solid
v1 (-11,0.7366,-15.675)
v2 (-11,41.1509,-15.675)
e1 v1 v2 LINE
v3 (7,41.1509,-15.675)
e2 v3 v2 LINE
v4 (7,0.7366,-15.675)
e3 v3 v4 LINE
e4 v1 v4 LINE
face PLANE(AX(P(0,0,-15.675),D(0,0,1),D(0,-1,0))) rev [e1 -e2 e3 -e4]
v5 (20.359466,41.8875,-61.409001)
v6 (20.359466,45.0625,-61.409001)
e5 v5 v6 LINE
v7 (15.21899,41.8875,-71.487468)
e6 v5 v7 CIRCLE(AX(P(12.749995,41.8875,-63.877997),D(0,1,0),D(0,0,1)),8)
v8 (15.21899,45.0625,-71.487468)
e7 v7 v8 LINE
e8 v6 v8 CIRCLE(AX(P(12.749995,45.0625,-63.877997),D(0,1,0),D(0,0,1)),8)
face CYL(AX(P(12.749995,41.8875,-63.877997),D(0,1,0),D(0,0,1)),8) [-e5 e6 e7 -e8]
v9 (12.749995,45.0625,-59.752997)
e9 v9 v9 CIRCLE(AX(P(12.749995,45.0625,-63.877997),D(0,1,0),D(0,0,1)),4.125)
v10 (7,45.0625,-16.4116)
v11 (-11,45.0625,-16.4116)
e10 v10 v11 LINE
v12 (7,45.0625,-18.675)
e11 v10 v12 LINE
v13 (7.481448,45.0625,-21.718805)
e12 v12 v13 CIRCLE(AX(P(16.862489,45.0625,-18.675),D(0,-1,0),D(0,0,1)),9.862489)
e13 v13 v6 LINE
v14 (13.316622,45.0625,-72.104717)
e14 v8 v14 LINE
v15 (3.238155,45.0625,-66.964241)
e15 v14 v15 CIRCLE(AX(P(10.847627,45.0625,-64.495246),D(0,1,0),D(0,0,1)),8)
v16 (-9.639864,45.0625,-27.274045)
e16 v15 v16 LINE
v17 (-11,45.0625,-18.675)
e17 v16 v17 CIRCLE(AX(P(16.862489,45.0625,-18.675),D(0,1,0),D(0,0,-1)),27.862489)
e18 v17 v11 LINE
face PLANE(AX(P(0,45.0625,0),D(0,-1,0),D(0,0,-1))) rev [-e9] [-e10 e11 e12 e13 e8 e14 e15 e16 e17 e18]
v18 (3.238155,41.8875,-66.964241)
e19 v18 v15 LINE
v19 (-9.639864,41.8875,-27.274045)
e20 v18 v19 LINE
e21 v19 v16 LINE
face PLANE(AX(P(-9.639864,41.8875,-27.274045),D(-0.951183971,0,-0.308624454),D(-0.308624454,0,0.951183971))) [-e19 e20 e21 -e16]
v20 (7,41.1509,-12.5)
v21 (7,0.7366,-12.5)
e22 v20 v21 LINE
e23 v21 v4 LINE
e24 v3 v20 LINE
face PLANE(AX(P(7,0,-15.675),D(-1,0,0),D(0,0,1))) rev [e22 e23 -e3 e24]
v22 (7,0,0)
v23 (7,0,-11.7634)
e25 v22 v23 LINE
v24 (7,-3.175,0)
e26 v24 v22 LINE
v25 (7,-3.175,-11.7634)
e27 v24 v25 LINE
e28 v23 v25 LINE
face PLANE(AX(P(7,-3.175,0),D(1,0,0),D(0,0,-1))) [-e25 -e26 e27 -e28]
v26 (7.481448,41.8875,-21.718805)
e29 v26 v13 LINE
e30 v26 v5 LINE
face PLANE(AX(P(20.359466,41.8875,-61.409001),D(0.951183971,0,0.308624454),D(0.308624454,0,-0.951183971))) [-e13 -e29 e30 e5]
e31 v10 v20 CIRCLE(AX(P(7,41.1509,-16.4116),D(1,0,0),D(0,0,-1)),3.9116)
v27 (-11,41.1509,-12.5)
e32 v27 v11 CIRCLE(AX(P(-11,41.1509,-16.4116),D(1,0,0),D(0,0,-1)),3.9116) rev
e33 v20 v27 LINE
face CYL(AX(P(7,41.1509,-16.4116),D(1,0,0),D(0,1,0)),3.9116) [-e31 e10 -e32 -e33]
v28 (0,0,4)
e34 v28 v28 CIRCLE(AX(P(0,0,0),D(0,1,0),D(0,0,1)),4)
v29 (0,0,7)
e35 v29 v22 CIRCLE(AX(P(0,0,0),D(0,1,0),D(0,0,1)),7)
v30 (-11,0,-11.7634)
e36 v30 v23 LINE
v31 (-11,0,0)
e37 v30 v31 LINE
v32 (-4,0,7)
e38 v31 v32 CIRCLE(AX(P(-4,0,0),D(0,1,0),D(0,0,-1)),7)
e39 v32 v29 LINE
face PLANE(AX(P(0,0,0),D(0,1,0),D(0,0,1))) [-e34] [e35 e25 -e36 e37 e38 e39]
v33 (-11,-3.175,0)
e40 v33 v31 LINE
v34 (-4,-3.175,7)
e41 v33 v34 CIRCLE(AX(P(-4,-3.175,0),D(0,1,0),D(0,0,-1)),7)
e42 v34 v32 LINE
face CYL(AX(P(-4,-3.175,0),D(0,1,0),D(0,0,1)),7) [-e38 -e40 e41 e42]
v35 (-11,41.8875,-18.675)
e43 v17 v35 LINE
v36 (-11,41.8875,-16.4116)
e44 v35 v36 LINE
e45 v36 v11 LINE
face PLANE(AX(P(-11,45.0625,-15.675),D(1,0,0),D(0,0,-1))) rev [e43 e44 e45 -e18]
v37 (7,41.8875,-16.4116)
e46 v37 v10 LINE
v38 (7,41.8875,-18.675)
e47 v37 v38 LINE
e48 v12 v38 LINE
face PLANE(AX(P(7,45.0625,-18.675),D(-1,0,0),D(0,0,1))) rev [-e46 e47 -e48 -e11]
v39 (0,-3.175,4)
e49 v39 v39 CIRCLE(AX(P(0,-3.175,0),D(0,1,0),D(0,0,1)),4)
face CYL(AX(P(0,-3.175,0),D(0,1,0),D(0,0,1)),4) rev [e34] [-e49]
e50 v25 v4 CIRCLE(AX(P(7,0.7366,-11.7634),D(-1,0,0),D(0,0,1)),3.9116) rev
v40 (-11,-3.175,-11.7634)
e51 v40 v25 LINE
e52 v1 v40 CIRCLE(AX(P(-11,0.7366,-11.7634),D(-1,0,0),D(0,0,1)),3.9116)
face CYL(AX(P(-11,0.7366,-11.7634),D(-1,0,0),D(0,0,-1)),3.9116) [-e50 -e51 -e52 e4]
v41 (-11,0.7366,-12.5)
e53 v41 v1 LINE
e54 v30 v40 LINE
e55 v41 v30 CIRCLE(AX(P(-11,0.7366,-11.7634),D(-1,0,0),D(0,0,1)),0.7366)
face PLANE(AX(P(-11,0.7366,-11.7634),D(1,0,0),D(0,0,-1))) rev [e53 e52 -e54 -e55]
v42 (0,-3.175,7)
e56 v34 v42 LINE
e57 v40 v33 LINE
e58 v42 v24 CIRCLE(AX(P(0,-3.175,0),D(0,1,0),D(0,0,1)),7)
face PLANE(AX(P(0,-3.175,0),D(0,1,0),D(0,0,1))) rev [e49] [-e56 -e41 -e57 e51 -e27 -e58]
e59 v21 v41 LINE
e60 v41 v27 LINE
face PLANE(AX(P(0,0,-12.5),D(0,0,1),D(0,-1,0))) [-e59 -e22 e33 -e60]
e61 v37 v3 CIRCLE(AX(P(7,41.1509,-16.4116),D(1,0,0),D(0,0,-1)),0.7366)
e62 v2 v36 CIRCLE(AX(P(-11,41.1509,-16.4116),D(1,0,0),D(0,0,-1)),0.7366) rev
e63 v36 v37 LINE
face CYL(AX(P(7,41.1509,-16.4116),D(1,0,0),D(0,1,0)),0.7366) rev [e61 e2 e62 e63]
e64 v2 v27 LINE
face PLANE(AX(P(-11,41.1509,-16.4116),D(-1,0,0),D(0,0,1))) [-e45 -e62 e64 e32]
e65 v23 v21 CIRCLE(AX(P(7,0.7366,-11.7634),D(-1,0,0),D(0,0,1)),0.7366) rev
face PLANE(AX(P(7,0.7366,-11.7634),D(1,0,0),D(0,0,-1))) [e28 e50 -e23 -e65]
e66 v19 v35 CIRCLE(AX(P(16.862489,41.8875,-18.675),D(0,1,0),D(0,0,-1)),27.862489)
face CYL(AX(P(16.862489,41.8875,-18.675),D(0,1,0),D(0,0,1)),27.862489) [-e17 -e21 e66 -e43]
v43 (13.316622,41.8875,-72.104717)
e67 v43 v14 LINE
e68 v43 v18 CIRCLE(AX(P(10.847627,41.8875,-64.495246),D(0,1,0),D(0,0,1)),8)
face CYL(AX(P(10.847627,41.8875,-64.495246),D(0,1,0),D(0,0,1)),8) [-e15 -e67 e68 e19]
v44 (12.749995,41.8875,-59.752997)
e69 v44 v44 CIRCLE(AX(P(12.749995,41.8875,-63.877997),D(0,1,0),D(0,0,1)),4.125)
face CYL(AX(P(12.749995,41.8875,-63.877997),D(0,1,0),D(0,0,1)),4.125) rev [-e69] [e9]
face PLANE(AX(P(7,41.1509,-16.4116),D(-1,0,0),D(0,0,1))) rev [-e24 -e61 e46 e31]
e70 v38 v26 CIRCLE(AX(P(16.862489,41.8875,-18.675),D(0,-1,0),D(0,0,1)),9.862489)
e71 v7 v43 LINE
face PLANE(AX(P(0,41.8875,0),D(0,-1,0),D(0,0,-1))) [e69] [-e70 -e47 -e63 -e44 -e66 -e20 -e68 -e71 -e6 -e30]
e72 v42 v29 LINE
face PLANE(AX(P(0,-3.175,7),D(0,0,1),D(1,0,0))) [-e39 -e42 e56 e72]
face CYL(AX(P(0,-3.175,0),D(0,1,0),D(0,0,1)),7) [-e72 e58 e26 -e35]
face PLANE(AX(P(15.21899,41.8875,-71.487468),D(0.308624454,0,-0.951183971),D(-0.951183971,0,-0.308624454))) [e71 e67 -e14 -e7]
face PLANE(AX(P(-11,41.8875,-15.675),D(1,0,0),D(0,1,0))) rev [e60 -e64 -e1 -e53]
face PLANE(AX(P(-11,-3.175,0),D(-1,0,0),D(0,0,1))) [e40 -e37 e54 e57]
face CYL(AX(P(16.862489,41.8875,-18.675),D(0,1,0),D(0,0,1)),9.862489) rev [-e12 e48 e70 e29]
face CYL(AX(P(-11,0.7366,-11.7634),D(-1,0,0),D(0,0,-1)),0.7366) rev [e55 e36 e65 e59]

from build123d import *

# Parameters (mm, degrees)
SKETCH1_R                    = 4
BASE_FLANGE1_DEPTH           = 3.175
EDGE_FLANGE1_STRIP_W         = 14.1732
EDGE_FLANGE1_STRIP_H         = 3.175
EDGE_FLANGE1_STRIP_CUT_DEPTH = 18
EDGE_FLANGE1_DEPTH           = 18
EDGE_FLANGE2_STRIP_W         = 14.1732
EDGE_FLANGE2_STRIP_H         = 3.175
EDGE_FLANGE2_STRIP_CUT_DEPTH = 18
EDGE_FLANGE2_DEPTH           = 18
SKETCH12_R                   = 4.125
BOSS_EXTRUDE1_DEPTH          = 3.175


# Sheet-metal steps are written as plain solids
with BuildPart() as part:
    # Sketch1 → Base-Flange1 (new body)
    with BuildSketch(Plane(origin=(0, 0, 0), x_dir=(1, 0, 0), z_dir=(0, 1, 0))):
        with BuildLine():
            Line((7, 0), (7, 12.5))
            Line((7, 12.5), (-11, 12.5))
            Line((-11, 12.5), (-11, 0))
            ThreePointArc((-11, 0), (-8.949747468, -4.949747468), (-4, -7))
            Line((-4, -7), (0, -7))
            ThreePointArc((0, -7), (4.949747468, -4.949747468), (7, 0))
        make_face()
        with Locations(Location((0, 0, 0), (0, 0, 270))):
            Circle(SKETCH1_R, mode=Mode.SUBTRACT)
    extrude(amount=-BASE_FLANGE1_DEPTH)

    # Edge-Flange1 strip (across the edge) → Edge-Flange1 strip cut (cut)
    with BuildSketch(Plane(origin=(7, 0, -12.5), x_dir=(0, 0, 1), z_dir=(-1, 0, 0))):
        with Locations((-6.35, -1.5875)):
            Rectangle(EDGE_FLANGE1_STRIP_W, EDGE_FLANGE1_STRIP_H)
    extrude(amount=EDGE_FLANGE1_STRIP_CUT_DEPTH, mode=Mode.SUBTRACT)

    # Edge-Flange1 section (across the edge) → Edge-Flange1 (add)
    with BuildSketch(Plane(origin=(7, 0, -12.5), x_dir=(0, 0, 1), z_dir=(-1, 0, 0))):
        with BuildLine():
            Line((-3.175, 0.7366), (-3.175, 41.8875))
            Line((-3.175, 41.8875), (0, 41.8875))
            Line((0, 41.8875), (0, 0.7366))
            ThreePointArc((0, 0.7366), (0.215745145, 0.215745145), (0.7366, 0))
            Line((0.7366, 0), (0.7366, -3.175))
            ThreePointArc((0.7366, -3.175), (-2.029318885, -2.029318885), (-3.175, 0.7366))
        make_face()
    extrude(amount=EDGE_FLANGE1_DEPTH)

    # Edge-Flange2 strip (across the edge) → Edge-Flange2 strip cut (cut)
    with BuildSketch(Plane(origin=(-11, 41.8875, -15.675), x_dir=(0, -1, 0), z_dir=(1, 0, 0))):
        with Locations((-6.35, -1.5875)):
            Rectangle(EDGE_FLANGE2_STRIP_W, EDGE_FLANGE2_STRIP_H)
    extrude(amount=EDGE_FLANGE2_STRIP_CUT_DEPTH, mode=Mode.SUBTRACT)

    # Edge-Flange2 section (across the edge) → Edge-Flange2 (add)
    with BuildSketch(Plane(origin=(-11, 41.8875, -15.675), x_dir=(0, -1, 0), z_dir=(1, 0, 0))):
        with BuildLine():
            Line((-3.175, 0.7366), (-3.175, 3))
            Line((-3.175, 3), (0, 3))
            Line((0, 3), (0, 0.7366))
            ThreePointArc((0, 0.7366), (0.215745145, 0.215745145), (0.7366, 0))
            Line((0.7366, 0), (0.7366, -3.175))
            ThreePointArc((0.7366, -3.175), (-2.029318885, -2.029318885), (-3.175, 0.7366))
        make_face()
    extrude(amount=EDGE_FLANGE2_DEPTH)

    # Sketch12 → Boss-Extrude1 (add)
    with BuildSketch(Plane(origin=(0, 45.0625, 0), x_dir=(1, 0, 0), z_dir=(0, 1, 0))):
        with BuildLine():
            Line((7, 18.675), (-11, 18.675))
            ThreePointArc((-11, 18.675), (-10.657865377, 23.027974643), (-9.639863923, 27.27404546))
            Line((-9.639863923, 27.27404546), (3.238154817, 66.964241218))
            ThreePointArc((3.238154817, 66.964241218), (7.212761051, 71.621798227), (13.316622217, 72.104717351))
            Line((13.316622217, 72.104717351), (15.218990158, 71.487468443))
            ThreePointArc((15.218990158, 71.487468443), (19.876547167, 67.512862208), (20.359466291, 61.409001043))
            Line((20.359466291, 61.409001043), (7.481447551, 21.718805285))
            ThreePointArc((7.481447551, 21.718805285), (7.121105439, 20.215823024), (7, 18.675))
        make_face()
        with Locations(Location((12.749994525, 63.877996676, 0), (0, 0, 270))):
            Circle(SKETCH12_R, mode=Mode.SUBTRACT)
    extrude(amount=-BOSS_EXTRUDE1_DEPTH)


solid = part.part
